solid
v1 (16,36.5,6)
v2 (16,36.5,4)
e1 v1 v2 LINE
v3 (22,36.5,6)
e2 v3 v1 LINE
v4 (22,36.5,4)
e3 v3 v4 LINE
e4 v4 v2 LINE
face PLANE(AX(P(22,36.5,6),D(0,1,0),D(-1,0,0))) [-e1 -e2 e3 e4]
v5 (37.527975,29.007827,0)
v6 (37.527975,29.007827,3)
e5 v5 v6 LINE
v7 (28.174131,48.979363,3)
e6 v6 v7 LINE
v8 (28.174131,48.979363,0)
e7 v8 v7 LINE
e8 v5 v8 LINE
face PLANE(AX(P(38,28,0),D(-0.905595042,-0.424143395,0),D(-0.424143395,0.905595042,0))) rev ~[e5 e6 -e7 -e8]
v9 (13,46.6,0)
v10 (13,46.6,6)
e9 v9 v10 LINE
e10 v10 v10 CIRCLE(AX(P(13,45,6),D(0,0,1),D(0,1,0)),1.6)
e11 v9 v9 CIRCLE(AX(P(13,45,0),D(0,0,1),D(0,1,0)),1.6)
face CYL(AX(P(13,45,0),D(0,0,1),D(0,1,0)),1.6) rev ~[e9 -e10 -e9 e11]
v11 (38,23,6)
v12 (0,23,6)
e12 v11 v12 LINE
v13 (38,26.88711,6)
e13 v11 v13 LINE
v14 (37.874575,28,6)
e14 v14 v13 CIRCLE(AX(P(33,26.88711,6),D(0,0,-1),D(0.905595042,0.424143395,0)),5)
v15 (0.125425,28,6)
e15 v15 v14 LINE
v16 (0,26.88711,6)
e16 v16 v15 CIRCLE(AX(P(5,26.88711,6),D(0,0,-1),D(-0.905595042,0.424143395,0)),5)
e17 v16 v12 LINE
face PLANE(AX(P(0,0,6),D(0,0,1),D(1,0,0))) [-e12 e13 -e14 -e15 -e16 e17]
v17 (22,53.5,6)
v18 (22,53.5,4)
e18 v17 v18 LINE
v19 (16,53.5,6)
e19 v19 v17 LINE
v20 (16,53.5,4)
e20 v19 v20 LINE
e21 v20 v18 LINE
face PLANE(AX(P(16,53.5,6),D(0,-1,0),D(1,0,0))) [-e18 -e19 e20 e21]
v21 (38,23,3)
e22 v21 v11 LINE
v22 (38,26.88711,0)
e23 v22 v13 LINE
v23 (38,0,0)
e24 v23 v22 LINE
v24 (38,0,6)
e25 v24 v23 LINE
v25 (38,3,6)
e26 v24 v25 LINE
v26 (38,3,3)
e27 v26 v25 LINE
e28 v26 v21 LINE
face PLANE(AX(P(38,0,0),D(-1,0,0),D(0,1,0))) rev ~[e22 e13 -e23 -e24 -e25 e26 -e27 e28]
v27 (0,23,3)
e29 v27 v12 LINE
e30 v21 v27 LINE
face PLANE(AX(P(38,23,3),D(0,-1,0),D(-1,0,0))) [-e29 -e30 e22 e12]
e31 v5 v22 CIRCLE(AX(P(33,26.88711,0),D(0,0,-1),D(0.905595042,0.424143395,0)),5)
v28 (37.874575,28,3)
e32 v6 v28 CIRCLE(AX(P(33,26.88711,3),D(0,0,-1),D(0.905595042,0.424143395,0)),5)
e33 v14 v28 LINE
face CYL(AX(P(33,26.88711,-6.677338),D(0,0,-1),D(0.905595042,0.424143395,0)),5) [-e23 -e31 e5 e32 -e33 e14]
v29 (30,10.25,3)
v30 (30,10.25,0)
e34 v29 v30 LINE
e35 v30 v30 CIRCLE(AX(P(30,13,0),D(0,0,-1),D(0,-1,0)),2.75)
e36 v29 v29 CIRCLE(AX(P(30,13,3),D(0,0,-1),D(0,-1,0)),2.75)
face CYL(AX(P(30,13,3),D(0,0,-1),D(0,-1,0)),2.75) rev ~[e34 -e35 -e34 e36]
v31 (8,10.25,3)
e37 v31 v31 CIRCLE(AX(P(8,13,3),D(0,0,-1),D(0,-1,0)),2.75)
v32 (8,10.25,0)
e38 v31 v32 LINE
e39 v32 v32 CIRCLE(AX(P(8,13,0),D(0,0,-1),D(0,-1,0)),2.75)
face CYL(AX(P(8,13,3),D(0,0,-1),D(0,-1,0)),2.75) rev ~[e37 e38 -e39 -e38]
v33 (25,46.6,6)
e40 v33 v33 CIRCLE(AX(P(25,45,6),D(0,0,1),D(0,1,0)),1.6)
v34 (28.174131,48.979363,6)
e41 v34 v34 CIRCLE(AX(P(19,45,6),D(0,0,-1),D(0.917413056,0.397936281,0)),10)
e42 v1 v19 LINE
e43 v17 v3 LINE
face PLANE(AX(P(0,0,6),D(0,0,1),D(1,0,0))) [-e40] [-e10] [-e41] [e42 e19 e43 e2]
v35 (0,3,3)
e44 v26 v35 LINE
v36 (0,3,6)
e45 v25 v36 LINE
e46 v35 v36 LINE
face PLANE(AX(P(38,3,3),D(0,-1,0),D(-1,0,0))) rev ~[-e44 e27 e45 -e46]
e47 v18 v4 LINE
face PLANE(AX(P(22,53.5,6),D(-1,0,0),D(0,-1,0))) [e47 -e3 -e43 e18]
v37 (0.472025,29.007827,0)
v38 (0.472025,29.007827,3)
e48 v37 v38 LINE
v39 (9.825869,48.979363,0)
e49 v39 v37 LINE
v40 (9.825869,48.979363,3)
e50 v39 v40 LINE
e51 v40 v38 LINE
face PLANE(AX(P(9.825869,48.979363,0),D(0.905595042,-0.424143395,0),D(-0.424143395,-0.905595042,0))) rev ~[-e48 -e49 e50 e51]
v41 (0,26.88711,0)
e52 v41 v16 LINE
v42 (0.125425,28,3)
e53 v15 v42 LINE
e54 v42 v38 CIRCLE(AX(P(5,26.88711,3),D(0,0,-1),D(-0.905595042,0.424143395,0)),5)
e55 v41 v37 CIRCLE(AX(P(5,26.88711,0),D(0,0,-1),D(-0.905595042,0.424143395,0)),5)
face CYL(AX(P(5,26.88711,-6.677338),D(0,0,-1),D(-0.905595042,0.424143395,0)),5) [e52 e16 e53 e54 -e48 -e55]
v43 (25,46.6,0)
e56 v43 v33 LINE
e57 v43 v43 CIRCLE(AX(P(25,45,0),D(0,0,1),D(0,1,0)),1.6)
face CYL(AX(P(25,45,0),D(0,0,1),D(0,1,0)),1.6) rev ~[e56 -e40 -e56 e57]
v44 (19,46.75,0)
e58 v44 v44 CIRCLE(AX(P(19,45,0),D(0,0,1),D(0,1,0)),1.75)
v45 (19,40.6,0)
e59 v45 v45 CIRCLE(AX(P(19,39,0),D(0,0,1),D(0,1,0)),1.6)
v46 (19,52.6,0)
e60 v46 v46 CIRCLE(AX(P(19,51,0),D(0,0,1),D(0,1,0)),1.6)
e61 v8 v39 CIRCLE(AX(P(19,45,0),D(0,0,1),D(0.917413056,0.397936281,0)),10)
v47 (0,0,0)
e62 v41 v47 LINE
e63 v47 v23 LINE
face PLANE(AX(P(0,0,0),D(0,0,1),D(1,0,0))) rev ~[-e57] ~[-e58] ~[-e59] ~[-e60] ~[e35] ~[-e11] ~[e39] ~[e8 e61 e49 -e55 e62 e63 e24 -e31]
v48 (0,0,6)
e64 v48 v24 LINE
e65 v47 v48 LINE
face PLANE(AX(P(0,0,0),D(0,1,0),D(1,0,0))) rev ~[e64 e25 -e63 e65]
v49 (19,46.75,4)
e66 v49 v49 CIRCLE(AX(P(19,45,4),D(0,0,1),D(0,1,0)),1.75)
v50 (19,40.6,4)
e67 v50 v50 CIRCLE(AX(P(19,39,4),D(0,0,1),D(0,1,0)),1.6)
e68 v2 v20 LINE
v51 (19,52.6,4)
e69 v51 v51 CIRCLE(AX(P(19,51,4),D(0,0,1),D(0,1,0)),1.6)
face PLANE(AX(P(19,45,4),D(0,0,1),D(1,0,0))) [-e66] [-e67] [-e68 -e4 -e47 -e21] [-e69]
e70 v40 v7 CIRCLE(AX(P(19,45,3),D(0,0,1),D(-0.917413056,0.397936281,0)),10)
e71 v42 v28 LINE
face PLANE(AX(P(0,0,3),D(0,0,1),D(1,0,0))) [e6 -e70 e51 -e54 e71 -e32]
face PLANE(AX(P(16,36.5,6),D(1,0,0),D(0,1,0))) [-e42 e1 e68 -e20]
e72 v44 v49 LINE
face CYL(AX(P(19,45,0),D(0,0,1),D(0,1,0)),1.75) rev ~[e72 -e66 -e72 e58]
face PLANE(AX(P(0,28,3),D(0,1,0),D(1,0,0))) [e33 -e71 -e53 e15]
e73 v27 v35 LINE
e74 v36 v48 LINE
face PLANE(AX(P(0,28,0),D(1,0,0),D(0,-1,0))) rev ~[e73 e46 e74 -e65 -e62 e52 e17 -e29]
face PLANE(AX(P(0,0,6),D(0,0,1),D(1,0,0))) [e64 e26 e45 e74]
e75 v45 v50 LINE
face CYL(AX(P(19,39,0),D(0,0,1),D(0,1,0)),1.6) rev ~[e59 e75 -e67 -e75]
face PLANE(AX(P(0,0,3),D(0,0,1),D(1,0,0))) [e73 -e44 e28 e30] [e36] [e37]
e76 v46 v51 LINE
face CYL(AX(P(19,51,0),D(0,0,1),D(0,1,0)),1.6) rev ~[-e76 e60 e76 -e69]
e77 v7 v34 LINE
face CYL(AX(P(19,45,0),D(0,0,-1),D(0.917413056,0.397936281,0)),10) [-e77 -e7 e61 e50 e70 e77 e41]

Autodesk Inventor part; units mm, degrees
ref_plane "YZ Plane" through (0, 0, 0) normal (1, 0, 0) x (0, 1, 0)
ref_plane "XZ Plane" through (0, 0, 0) normal (0, 1, 0) x (-1, 0, 0)
ref_plane "XY Plane" through (0, 0, 0) normal (0, 0, 1) x (1, 0, 0)
sketch "スケッチ1" plane through (0, 0, 0) normal (0, 0, 1) x (1, 0, 0)
  line L0 (0, 0) -> (38, 0)
  line L1 (38, 0) -> (38, 28)
  line L2 (0, 28) -> (0, 0)
  circle A0 centre (19, 45) radius 10
  line L3 (19, 45) -> (19, 0)
  line L4 (9, 45) -> (29, 45)
  line L5 (10.069714, 49.5) -> (27.930286, 49.5)
  line L6 (10.069714, 49.5) -> (0, 28)
  line L7 (27.930286, 49.5) -> (38, 28)
  point P0 (28.174131, 48.979363)
  point P1 (9.825869, 48.979363)
  dimension "d0" = 38
  dimension "d1" = 28
  dimension "d3" = 20
  dimension "d56" = 45
  dimension "d71" = 28
  dimension "d73" = 4.5
sketch "スケッチ1 outline for 押し出し1" plane through (0, 0, 0) normal (0, 0, 1) x (1, 0, 0)
  line L0 (9.825869, 48.979363) -> (0, 28)
  line L1 (0, 28) -> (0, 0)
  line L2 (0, 0) -> (38, 0)
  line L3 (38, 0) -> (38, 28)
  line L4 (38, 28) -> (28.174131, 48.979363)
  arc A0 (28.174131, 48.979363) -> (9.825869, 48.979363) centre (19, 45) ccw
extrude "押し出し1" add sketch "スケッチ1 outline for 押し出し1" along normal blind 3
sketch "スケッチ7" plane through (0, 0, 3) normal (0, 0, 1) x (1, 0, 0)
  line L0 (0, 0) -> (38, 0)
  line L1 (38, 0) -> (38, 28)
  line L2 (0, 0) -> (38, 0)
  line L3 (38, 0) -> (38, 3)
  line L4 (38, 3) -> (0, 3)
  line L5 (0, 3) -> (0, 0)
  arc A0 (28.174131, 48.979363) -> (9.825869, 48.979363) centre (19, 45) ccw
  circle A1 centre (19, 45) radius 10
  line L6 (0, 28) -> (0, 0)
  line L7 (0, 28) -> (38, 28)
  line L8 (38, 28) -> (38, 23)
  line L9 (38, 23) -> (0, 23)
  line L10 (0, 23) -> (0, 28)
  point P0 (27.930286, 47.5)
  point P1 (10.069714, 47.5)
  point P2 (0, 23)
  point P3 (29, 43)
  point P4 (9, 43)
  point P5 (10.069714, 47.5)
  point P6 (27.930286, 47.5)
  point P7 (9.486338, 51.080624)
  point P8 (28.513662, 51.080624)
  dimension "d58" = 3
  dimension "d68" = 20
  dimension "d69" = 20
  dimension "d70" = 5
extrude "押し出し4" add sketch "スケッチ7" along normal blind 3 contours L5 L4 L1 L0 | L6 L7 L1 L9 | A1 A0
sketch "スケッチ10" plane through (19, 45, 6) normal (0, 0, 1) x (1, 0, 0)
  line L0 (-3, 8.5) -> (3, 8.5)
  line L1 (3, 8.5) -> (3, -8.5)
  line L2 (3, -8.5) -> (-3, -8.5)
  line L3 (-3, -8.5) -> (-3, 8.5)
  circle A0 centre (0, 0) radius 10 projected
  point P0 (-19, -45)
  dimension "d74" = 8.5
  dimension "d75" = 17
  dimension "d76" = 6
  dimension "d77" = 3
extrude "押し出し7" cut sketch "スケッチ10" against normal blind 2 contours L0 L1 L2 L3
sketch "スケッチ11" plane through (0, 0, 0) normal (0, 0, -1) x (-1, 0, 0)
  arc A0 (-9.825869, 48.979363) -> (-28.174131, 48.979363) centre (-19, 45) ccw
  point P0 (0, 0)
  point P1 (-27.930286, 47.5)
  point P2 (-10.069714, 47.5)
  point P3 (-19, 51)
  point P4 (-25, 45)
  point P5 (-19, 39)
  point P6 (-13, 45)
  dimension "d80" = 6
  dimension "d83" = 360
hole "穴4" at (19, 51, 0) at (25, 45, 0) at (19, 39, 0) at (13, 45, 0) direction (0, 0, 1) diameter 3.2 end through all
sketch "スケッチ12" plane through (0, 0, 0) normal (0, 0, -1) x (-1, 0, 0)
  circle A0 centre (-19, 45) radius 10 projected
  point P0 (0, 0)
hole "穴5" at (19, 45, 0) direction (0, 0, 1) diameter 3.5 end through all
sketch "スケッチ13" plane through (0, 0, 0) normal (0, 0, -1) x (-1, 0, 0)
  circle A0 centre (-19, 45) radius 1.75
  circle A1 centre (-13, 45) radius 1.6
  circle A2 centre (-19, 39) radius 1.6
  circle A3 centre (-25, 45) radius 1.6
  circle A4 centre (-19, 51) radius 1.6
  arc A5 (-9.825869, 48.979363) -> (-28.174131, 48.979363) centre (-19, 45) ccw
  line L0 (-38, 28) -> (-28.174131, 48.979363)
  line L1 (-38, 0) -> (-38, 28)
  line L2 (0, 0) -> (-38, 0)
  line L3 (0, 28) -> (0, 0)
  line L4 (-9.825869, 48.979363) -> (0, 28)
fillet "フィレット1" radius 5 2 edges at (0, 28, 1.5) (38, 28, 1.5)
sketch "スケッチ14" plane through (0, 0, 3) normal (0, 0, 1) x (1, 0, 0)
  line L0 (0, 0) -> (38, 0) projected
  line L1 (0, 23) -> (0, 3) projected
  line L2 (38, 3) -> (38, 23) projected
  point P0 (8, 13)
  point P1 (30, 13)
  dimension "d100" = 13
  dimension "d101" = 13
  dimension "d102" = 8
  dimension "d103" = 8
hole "穴6" at (8, 13, 3) at (30, 13, 3) direction (0, 0, -1) diameter 5.5 end through all
properties part number "robot-arm-frame-base"
